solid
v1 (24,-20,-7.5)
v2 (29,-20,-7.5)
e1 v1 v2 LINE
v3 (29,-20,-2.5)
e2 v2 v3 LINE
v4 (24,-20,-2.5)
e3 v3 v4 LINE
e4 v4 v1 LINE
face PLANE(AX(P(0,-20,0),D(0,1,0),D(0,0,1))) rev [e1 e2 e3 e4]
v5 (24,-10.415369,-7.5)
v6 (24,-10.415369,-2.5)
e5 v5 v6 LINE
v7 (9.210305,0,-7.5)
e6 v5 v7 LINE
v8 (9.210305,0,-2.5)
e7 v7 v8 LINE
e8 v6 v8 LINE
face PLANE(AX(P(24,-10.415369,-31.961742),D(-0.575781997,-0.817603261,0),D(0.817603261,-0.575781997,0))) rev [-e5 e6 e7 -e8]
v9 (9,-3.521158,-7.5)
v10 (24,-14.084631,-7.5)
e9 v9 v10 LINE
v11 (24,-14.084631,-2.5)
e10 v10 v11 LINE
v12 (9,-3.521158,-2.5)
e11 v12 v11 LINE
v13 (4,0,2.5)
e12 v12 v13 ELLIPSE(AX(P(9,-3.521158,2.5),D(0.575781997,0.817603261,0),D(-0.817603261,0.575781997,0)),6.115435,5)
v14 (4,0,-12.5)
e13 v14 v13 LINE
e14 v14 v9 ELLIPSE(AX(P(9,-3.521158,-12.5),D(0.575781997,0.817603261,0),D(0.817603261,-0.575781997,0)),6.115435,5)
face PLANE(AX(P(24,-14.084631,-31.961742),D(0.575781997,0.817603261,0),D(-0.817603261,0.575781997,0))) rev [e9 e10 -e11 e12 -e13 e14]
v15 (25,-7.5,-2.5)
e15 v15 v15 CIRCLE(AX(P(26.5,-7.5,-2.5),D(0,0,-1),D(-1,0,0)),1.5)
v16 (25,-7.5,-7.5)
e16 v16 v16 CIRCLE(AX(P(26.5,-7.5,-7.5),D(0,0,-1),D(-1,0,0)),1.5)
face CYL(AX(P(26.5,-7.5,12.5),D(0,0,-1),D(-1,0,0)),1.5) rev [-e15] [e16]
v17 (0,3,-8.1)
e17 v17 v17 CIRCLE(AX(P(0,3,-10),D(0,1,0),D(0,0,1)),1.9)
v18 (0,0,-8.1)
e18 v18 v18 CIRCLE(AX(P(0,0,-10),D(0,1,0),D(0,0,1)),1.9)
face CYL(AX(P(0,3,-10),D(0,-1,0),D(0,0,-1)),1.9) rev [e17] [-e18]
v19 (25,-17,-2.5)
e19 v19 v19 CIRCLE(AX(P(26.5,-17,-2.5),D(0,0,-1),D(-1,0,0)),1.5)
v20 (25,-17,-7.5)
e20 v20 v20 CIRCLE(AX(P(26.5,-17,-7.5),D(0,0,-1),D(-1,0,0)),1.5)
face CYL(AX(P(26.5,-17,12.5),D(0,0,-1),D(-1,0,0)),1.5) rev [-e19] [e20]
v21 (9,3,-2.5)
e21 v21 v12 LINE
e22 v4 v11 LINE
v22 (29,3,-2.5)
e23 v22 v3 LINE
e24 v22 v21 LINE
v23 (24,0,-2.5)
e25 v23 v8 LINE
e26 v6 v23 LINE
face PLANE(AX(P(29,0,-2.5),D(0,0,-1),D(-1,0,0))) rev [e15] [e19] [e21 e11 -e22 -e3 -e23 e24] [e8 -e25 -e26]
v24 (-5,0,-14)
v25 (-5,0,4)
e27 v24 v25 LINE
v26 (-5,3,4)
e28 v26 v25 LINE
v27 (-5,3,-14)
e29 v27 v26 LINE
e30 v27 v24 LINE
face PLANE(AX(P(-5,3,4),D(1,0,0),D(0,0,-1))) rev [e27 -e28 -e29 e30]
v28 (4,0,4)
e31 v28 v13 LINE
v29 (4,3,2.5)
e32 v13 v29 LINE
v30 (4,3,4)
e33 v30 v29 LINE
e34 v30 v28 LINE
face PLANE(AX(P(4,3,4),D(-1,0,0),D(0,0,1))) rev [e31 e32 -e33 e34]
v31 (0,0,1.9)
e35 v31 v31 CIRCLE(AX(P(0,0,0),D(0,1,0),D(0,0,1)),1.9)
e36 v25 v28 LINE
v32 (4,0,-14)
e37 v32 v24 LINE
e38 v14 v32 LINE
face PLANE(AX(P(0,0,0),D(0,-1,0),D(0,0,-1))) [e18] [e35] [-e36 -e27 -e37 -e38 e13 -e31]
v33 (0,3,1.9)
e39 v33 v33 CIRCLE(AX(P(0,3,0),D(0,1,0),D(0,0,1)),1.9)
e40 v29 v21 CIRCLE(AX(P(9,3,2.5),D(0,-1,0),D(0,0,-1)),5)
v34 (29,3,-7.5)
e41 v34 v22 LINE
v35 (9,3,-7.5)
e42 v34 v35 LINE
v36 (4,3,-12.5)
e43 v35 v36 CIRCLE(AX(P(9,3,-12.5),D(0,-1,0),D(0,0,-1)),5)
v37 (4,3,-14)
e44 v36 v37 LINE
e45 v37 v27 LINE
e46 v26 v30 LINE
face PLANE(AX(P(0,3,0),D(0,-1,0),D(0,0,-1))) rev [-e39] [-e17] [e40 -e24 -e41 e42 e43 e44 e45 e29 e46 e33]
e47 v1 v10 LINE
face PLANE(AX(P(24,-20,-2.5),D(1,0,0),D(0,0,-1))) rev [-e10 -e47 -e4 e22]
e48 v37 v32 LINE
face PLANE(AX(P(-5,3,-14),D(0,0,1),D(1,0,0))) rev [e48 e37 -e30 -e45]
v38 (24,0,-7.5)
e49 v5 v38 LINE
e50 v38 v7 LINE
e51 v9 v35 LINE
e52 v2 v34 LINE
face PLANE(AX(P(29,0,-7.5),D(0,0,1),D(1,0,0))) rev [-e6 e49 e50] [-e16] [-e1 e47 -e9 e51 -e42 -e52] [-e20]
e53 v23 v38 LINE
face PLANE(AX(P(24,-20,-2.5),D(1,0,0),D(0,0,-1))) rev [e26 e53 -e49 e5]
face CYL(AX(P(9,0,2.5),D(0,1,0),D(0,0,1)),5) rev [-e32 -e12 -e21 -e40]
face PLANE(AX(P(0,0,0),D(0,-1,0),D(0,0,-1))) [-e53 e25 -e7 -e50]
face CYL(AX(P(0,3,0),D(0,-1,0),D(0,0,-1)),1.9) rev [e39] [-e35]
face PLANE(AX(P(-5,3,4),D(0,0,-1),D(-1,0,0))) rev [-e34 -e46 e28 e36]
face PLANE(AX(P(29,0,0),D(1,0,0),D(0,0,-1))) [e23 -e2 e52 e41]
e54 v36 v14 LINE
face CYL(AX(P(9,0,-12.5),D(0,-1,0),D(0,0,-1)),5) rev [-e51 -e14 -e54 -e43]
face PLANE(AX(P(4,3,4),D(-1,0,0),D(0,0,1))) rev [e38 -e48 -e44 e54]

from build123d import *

# Parameters (mm, degrees)
SKETCH1_W                       = 9
SKETCH1_H                       = 18
SKETCH1_R                       = 1.9
BODY_MOUNT_DEPTH                = 3
SKETCH2_W                       = 5
SKETCH2_H                       = 3
BOSS_EXTRUDE2_DEPTH             = 25
SKETCH3_W                       = 5
SKETCH3_H                       = 5
BOSS_EXTRUDE3_DEPTH             = 20
SKETCH4_R                       = 1.5
CUT_EXTRUDE1_DEPTH              = 20
BOSS_EXTRUDE4_REACH             = 38.359
BOSS_EXTRUDE4_DIRECTION_2_REACH = 38.359
FILLET2_R                       = 5


with BuildPart() as part:
    # Sketch1 → body mount (new body)
    with BuildSketch(Plane(origin=(0, 0, 0), x_dir=(1, 0, 0), z_dir=(0, 1, 0))):
        with Locations((-0.5, 5)):
            Rectangle(SKETCH1_W, SKETCH1_H)
        with Locations(Location((0, 0, 0), (0, 0, 270))):
            Circle(SKETCH1_R, mode=Mode.SUBTRACT)
        with Locations(Location((0, 10, 0), (0, 0, 270))):
            Circle(SKETCH1_R, mode=Mode.SUBTRACT)
    extrude(amount=BODY_MOUNT_DEPTH)

    # Sketch2 → Boss-Extrude2 (add)
    with BuildSketch(Plane(origin=(4, 0, 0), x_dir=(0, 0, -1), z_dir=(1, 0, 0))):
        with Locations((5, 1.5)):
            Rectangle(SKETCH2_W, SKETCH2_H)
    extrude(amount=BOSS_EXTRUDE2_DEPTH)

    # Sketch3 → Boss-Extrude3 (add)
    with BuildSketch(Plane.XZ):
        with Locations((26.5, -5)):
            Rectangle(SKETCH3_W, SKETCH3_H)
    extrude(amount=BOSS_EXTRUDE3_DEPTH)

    # Sketch4 → Cut-Extrude1 (cut)
    with BuildSketch(Plane(origin=(0, 0, -7.5), x_dir=(-1, 0, 0), z_dir=(0, 0, -1))):
        with Locations((-26.5, -17)):
            Circle(SKETCH4_R)
        with Locations((-26.5, -7.5)):
            Circle(SKETCH4_R)
    extrude(amount=-CUT_EXTRUDE1_DEPTH, mode=Mode.SUBTRACT)

    # Boss-Extrude4: up to this face of the body (flat: up to its plane)
    boss_extrude4_end = Plane(part.part.faces().sort_by_distance((16.5, 2.660294245, -7.5))[0])
    # Sketch5 → Boss-Extrude4 (add, up to the picked face)
    with BuildSketch(Plane(origin=(0, 0, -5), x_dir=(-1, 0, 0), z_dir=(0, 0, -1)), mode=Mode.PRIVATE) as boss_extrude4_sk1:
        Polygon((-24, -10.415369352), (-9.210305315, 0), (-4, 0), (-24, -14.084630648), align=None)
    boss_extrude4_tool1 = split(extrude(boss_extrude4_sk1.sketch, amount=BOSS_EXTRUDE4_REACH, mode=Mode.PRIVATE), bisect_by=boss_extrude4_end, keep=Keep.BOTH, mode=Mode.PRIVATE)
    add(boss_extrude4_tool1.solids().sort_by(Axis((15.237549, -6.170794, -5), (0, 0, -1)))[0])

    # Boss-Extrude4 direction 2: up to this face of the body (flat: up to its plane)
    boss_extrude4_direction_2_end = Plane(part.part.faces().sort_by_distance((14, 0.339705755, -2.5))[0])
    # Sketch5 → Boss-Extrude4 direction 2 (add, up to the picked face)
    with BuildSketch(Plane(origin=(0, 0, -5), x_dir=(-1, 0, 0), z_dir=(0, 0, -1)), mode=Mode.PRIVATE) as boss_extrude4_direction_2_sk1:
        Polygon((-24, -10.415369352), (-9.210305315, 0), (-4, 0), (-24, -14.084630648), align=None)
    boss_extrude4_direction_2_tool1 = split(extrude(boss_extrude4_direction_2_sk1.sketch, amount=-BOSS_EXTRUDE4_DIRECTION_2_REACH, mode=Mode.PRIVATE), bisect_by=boss_extrude4_direction_2_end, keep=Keep.BOTH, mode=Mode.PRIVATE)
    add(boss_extrude4_direction_2_tool1.solids().sort_by(Axis((15.237549, -6.170794, -5), (0, 0, 1)))[0])

    # Fillet2
    # the kernel refuses this fillet: 5 mm, written as the material it adds along each edge
    with BuildSketch(Plane(origin=(4, 3, -7.5), x_dir=(0, 0, -1), z_dir=(0, -1, 0))) as fillet2_piece_1_section:
        with BuildLine():
            CenterArc((FILLET2_R, FILLET2_R), FILLET2_R, 180, 90)
            Line((0, FILLET2_R), (0, 0))
            Line((0, 0), (FILLET2_R, 0))
        make_face()
    fillet2_piece_1 = extrude(amount=3, mode=Mode.PRIVATE)
    fillet2_piece_1 = split(fillet2_piece_1, bisect_by=Plane(origin=(4.050655402, -0.035673131, -8.630736825), z_dir=(0.5757819971310116, 0.8176032606220598, 0)), keep=Keep.TOP, mode=Mode.PRIVATE)
    add(fillet2_piece_1)
    with BuildSketch(Plane(origin=(4, 3, -7.5), x_dir=(0, 0, -1), z_dir=(0, -1, 0))) as fillet2_piece_2_section:
        with BuildLine():
            CenterArc((FILLET2_R, FILLET2_R), FILLET2_R, 180, 90)
            Line((0, FILLET2_R), (0, 0))
            Line((0, 0), (FILLET2_R, 0))
        make_face()
    fillet2_piece_2 = extrude(amount=15.5, mode=Mode.PRIVATE)
    fillet2_piece_2 = split(fillet2_piece_2, bisect_by=Plane(origin=(6.150590259, 0, -8.032362576), z_dir=(0, -1, 0)), keep=Keep.TOP, mode=Mode.PRIVATE)
    fillet2_piece_2 = split(fillet2_piece_2, bisect_by=Plane(origin=(5.79410314, -1.263464003, -8.032362576), z_dir=(0.5757819971310116, 0.8176032606220598, 0)), keep=Keep.TOP, mode=Mode.PRIVATE)
    add(fillet2_piece_2)
    with BuildSketch(Plane(origin=(4, -12.5, -2.5), x_dir=(1, 0, 0), z_dir=(0, 1, 0))) as fillet2_piece_3_section:
        with BuildLine():
            CenterArc((FILLET2_R, -FILLET2_R), FILLET2_R, 90, 90)
            Line((0, -FILLET2_R), (0, 0))
            Line((0, 0), (FILLET2_R, 0))
        make_face()
    fillet2_piece_3 = extrude(amount=15.5, mode=Mode.PRIVATE)
    fillet2_piece_3 = split(fillet2_piece_3, bisect_by=Plane(origin=(5.79410314, -1.263464003, -1.967637424), z_dir=(0.5757819971310116, 0.8176032606220598, 0)), keep=Keep.TOP, mode=Mode.PRIVATE)
    fillet2_piece_3 = split(fillet2_piece_3, bisect_by=Plane(origin=(6.150590259, 0, -1.967637424), z_dir=(0, -1, 0)), keep=Keep.TOP, mode=Mode.PRIVATE)
    add(fillet2_piece_3)
    with BuildSketch(Plane(origin=(4, 0, -2.5), x_dir=(1, 0, 0), z_dir=(0, 1, 0))) as fillet2_piece_4_section:
        with BuildLine():
            CenterArc((FILLET2_R, -FILLET2_R), FILLET2_R, 90, 90)
            Line((0, -FILLET2_R), (0, 0))
            Line((0, 0), (FILLET2_R, 0))
        make_face()
    fillet2_piece_4 = extrude(amount=3, mode=Mode.PRIVATE)
    fillet2_piece_4 = split(fillet2_piece_4, bisect_by=Plane(origin=(4.050655402, -0.035673131, -1.369263175), z_dir=(0.5757819971310116, 0.8176032606220598, 0)), keep=Keep.TOP, mode=Mode.PRIVATE)
    add(fillet2_piece_4)


solid = part.part
